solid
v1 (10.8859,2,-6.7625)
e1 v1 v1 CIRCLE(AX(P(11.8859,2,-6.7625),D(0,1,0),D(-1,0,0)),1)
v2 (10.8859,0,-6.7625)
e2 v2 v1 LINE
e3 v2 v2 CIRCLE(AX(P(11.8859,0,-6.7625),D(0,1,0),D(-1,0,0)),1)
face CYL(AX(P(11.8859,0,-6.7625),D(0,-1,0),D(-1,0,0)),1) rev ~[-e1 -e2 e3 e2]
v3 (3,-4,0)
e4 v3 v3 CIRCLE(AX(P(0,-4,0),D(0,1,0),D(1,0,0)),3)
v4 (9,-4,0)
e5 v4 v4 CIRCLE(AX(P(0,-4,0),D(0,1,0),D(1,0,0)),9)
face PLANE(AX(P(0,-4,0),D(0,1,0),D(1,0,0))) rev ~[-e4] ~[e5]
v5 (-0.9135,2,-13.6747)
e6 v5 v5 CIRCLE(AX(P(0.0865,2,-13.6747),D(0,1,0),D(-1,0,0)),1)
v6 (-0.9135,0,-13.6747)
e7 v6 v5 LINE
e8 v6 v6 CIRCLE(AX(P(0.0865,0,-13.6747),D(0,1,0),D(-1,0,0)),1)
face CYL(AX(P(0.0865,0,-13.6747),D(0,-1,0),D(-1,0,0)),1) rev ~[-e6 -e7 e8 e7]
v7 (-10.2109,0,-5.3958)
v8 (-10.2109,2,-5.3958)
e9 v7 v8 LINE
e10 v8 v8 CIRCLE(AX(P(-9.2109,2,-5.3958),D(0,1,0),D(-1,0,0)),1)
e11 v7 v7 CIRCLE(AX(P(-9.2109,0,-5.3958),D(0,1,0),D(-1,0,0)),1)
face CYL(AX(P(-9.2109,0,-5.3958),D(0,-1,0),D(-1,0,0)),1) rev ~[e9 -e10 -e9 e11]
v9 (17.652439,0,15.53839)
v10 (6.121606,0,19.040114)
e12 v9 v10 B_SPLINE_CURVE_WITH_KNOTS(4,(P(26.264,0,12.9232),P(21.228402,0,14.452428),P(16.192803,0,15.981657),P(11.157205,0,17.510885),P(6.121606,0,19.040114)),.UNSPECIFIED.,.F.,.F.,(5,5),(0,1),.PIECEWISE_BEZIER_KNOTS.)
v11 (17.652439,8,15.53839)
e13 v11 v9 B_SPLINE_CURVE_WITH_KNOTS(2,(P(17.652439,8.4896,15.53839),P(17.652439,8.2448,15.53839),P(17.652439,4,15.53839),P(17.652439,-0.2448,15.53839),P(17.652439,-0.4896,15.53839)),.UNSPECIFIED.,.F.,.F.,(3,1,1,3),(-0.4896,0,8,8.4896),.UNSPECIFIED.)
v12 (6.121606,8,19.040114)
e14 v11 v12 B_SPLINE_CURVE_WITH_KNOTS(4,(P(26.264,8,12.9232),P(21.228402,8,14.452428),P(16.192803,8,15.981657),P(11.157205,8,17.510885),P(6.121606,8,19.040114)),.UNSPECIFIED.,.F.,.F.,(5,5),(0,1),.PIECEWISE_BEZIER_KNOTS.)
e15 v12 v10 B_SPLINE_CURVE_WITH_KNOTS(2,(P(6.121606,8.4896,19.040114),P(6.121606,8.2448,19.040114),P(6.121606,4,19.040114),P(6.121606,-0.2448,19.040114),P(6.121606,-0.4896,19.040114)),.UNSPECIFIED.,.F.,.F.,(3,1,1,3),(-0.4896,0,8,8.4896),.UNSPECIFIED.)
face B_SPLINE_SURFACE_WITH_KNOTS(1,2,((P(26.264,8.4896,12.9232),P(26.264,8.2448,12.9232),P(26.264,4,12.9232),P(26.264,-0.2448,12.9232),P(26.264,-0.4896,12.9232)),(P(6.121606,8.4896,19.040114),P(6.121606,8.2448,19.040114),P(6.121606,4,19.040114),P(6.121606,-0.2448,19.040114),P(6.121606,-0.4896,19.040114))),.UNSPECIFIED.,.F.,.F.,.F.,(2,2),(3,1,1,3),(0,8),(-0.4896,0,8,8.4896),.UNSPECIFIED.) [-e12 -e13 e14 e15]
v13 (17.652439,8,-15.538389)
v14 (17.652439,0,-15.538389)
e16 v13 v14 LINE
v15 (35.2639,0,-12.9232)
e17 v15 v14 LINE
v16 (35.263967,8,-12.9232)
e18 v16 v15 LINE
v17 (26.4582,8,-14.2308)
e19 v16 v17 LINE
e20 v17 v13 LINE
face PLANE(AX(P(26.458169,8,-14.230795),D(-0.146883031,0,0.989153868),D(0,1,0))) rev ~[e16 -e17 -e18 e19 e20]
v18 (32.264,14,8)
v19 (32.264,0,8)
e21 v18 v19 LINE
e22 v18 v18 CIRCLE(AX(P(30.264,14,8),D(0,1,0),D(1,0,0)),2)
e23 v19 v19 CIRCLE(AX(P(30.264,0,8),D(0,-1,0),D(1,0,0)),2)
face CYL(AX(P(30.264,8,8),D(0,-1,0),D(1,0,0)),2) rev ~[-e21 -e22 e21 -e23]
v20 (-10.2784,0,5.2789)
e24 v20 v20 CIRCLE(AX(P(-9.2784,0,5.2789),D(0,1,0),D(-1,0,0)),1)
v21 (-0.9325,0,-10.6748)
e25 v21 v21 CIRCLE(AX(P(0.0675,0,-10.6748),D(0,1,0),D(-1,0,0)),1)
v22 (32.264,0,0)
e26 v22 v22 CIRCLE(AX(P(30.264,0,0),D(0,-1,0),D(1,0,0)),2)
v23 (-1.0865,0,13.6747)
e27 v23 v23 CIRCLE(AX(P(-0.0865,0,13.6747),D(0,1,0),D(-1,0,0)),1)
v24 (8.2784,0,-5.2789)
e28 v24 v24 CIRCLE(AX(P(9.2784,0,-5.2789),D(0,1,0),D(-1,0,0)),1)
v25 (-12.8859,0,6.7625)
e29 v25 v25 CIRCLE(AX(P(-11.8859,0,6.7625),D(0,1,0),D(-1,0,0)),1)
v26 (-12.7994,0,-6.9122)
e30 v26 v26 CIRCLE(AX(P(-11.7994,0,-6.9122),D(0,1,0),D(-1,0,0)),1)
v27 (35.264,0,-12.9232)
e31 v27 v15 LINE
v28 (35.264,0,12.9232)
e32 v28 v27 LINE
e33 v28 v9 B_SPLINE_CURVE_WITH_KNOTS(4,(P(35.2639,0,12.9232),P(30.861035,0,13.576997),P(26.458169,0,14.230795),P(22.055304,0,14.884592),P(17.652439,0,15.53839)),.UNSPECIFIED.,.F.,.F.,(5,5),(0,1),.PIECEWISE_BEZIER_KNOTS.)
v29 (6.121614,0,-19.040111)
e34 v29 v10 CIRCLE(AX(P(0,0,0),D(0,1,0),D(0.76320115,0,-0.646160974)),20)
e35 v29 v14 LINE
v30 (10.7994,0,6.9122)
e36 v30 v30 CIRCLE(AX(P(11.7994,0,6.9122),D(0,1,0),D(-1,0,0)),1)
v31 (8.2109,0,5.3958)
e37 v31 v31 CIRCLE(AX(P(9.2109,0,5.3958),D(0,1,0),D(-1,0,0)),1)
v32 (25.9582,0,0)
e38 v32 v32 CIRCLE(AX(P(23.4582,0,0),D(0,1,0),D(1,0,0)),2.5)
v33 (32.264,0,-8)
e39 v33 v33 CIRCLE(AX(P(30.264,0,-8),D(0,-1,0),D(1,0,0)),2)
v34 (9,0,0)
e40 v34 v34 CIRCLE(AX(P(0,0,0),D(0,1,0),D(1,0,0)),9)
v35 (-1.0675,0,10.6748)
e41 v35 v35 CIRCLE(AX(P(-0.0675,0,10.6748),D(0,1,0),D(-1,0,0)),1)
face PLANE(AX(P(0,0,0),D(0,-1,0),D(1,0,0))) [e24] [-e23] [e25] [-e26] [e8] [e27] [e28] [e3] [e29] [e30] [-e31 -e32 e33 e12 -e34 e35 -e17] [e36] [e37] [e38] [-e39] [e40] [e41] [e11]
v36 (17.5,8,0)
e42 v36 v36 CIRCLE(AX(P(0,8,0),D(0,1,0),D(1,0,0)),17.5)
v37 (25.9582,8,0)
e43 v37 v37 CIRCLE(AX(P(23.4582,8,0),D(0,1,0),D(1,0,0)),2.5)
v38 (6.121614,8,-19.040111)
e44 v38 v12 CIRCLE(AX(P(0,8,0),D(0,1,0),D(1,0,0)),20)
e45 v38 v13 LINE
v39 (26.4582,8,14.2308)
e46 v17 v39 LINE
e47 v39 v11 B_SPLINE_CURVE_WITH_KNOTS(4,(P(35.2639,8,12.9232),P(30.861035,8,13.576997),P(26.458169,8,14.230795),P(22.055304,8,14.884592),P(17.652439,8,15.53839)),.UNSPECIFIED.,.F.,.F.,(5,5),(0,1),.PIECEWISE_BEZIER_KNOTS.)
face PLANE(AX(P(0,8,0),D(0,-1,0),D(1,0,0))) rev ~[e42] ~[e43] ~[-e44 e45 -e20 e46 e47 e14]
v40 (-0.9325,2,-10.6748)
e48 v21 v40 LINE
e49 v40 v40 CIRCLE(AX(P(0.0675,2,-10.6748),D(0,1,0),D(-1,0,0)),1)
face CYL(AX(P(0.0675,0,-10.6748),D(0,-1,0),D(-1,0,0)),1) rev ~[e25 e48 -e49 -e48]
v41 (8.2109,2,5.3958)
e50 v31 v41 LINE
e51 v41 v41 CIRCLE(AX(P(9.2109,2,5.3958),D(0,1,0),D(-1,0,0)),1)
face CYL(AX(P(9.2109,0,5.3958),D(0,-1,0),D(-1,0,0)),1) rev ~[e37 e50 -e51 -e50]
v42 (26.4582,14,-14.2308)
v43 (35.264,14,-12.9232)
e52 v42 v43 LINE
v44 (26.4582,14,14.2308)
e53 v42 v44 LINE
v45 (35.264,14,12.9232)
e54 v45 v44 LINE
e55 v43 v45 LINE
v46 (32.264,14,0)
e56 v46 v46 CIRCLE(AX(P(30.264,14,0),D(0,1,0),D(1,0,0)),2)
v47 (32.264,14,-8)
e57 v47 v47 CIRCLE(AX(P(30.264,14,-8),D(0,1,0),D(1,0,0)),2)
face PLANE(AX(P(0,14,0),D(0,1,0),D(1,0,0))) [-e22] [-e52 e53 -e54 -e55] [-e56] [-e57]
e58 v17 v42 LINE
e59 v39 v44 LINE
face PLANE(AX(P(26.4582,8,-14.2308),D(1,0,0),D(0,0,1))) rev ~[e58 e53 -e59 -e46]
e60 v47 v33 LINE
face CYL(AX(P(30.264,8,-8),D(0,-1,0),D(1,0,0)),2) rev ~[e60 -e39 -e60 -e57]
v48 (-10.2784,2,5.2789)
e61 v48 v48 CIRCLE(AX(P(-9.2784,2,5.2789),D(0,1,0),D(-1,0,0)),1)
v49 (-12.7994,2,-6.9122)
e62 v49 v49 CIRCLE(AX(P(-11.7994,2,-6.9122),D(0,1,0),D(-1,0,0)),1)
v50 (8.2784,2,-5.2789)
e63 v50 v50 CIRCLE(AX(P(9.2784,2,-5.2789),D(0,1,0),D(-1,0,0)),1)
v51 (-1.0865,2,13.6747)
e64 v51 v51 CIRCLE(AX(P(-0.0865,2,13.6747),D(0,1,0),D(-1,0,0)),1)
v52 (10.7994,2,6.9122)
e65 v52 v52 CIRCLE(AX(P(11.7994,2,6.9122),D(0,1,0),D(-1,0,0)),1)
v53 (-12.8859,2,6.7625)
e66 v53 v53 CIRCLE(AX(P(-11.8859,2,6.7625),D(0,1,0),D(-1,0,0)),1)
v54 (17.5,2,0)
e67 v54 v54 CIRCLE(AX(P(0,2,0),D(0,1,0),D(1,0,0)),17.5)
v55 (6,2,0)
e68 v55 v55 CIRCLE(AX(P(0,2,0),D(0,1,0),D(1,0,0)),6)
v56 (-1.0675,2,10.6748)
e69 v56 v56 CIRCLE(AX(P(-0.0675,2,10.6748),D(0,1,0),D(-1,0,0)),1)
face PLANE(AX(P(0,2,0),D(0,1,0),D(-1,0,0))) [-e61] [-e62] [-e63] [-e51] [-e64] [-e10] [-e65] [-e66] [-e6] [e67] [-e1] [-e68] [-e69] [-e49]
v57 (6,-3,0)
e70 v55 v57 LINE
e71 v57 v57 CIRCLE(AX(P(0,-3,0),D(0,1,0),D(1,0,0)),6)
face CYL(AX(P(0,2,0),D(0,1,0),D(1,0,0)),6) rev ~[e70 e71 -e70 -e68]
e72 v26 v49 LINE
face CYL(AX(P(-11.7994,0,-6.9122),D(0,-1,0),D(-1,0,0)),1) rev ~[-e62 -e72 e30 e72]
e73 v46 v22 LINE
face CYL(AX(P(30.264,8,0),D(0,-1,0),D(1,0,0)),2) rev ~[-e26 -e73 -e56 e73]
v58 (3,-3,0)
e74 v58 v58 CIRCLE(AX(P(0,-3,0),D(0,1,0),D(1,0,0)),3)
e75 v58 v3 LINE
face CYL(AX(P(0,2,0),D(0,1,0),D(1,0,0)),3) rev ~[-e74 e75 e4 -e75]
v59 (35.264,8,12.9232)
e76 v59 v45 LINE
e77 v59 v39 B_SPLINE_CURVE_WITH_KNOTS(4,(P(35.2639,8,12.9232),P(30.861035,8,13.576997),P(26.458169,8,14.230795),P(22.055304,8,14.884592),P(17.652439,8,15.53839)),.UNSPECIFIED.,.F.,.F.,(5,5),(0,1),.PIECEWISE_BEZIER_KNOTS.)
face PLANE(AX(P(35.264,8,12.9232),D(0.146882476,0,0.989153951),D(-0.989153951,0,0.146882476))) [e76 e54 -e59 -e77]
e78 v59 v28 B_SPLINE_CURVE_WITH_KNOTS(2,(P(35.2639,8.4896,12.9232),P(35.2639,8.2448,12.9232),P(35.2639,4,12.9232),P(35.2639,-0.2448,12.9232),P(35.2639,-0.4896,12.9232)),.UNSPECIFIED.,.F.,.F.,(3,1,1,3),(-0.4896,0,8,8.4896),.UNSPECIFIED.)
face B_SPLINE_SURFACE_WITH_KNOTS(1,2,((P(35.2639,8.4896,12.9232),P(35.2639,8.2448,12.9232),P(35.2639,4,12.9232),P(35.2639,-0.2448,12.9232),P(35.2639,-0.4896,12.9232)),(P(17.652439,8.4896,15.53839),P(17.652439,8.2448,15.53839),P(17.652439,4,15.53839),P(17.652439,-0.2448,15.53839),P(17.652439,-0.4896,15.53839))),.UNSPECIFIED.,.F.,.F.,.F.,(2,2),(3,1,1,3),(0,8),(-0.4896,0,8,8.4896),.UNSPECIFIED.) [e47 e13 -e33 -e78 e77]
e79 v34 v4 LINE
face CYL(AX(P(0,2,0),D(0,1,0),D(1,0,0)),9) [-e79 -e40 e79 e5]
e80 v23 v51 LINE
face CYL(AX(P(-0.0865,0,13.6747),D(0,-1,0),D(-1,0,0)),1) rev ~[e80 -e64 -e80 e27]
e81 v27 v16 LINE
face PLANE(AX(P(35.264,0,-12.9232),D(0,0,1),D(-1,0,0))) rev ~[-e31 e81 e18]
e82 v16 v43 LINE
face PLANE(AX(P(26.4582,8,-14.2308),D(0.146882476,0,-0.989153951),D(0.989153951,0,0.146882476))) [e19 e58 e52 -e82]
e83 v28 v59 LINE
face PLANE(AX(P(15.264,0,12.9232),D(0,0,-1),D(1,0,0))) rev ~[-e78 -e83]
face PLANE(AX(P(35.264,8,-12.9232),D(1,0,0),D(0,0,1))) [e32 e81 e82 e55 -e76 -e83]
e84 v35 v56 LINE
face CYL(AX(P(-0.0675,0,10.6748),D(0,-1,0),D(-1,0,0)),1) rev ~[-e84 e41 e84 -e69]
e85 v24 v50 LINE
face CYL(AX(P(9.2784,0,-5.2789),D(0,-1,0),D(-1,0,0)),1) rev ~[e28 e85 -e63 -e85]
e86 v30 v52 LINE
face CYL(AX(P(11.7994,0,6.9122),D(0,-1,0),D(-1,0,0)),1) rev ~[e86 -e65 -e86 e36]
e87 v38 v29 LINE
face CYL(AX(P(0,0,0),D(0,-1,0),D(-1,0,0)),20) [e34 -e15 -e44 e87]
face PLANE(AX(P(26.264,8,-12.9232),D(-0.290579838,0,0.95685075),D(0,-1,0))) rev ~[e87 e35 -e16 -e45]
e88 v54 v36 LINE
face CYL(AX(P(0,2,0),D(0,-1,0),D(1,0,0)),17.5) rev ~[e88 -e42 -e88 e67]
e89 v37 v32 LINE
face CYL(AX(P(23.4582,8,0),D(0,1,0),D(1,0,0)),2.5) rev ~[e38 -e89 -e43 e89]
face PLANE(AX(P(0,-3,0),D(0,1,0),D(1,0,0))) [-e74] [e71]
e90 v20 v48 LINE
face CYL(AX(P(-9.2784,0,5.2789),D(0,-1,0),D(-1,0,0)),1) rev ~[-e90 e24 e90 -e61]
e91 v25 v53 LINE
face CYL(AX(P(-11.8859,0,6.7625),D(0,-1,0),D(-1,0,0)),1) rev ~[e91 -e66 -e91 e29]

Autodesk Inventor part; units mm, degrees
ref_plane "YZ Plane" through (0, 0, 0) normal (1, 0, 0) x (0, 1, 0)
ref_plane "XZ Plane" through (0, 0, 0) normal (0, 1, 0) x (-1, 0, 0)
ref_plane "XY Plane" through (0, 0, 0) normal (0, 0, 1) x (1, 0, 0)
sketch "Эскиз1" plane through (0, 0, 0) normal (0, 1, 0) x (-1, 0, 0)
  arc A0 (13.2517, 5.1196) -> (11.6396, 8.8847) centre (11.8859, 6.7625) ccw
  line L0 (11.6396, 8.8847) -> (3.5765, 5.9707)
  line L1 (3.5765, 5.9707) -> (2.1921, 14.0362)
  arc A1 (2.1921, 14.0362) -> (-1.8746, 14.5225) centre (0.0865, 13.6747) ccw
  line L2 (-1.8746, 14.5225) -> (-3.3825, 6.0827)
  line L3 (-3.3825, 6.0827) -> (-11.0596, 8.9165)
  arc A2 (-11.0596, 8.9165) -> (-13.5142, 5.6378) centre (-11.7994, 6.9122) ccw
  line L4 (-13.5142, 5.6378) -> (-6.959, 0.112)
  line L5 (-6.959, 0.112) -> (-13.2517, -5.1196)
  arc A3 (-13.2517, -5.1196) -> (-11.6396, -8.8847) centre (-11.8859, -6.7625) ccw
  line L6 (-11.6396, -8.8847) -> (-3.5765, -5.9707)
  line L7 (-3.5765, -5.9707) -> (-2.1921, -14.0362)
  arc A4 (-2.1921, -14.0362) -> (1.8746, -14.5225) centre (-0.0865, -13.6747) ccw
  line L8 (1.8746, -14.5225) -> (3.3825, -6.0827)
  line L9 (3.3825, -6.0827) -> (11.0596, -8.9165)
  arc A5 (11.0596, -8.9165) -> (13.5142, -5.6378) centre (11.7994, -6.9122) ccw
  line L10 (13.5142, -5.6378) -> (6.959, -0.112)
  line L11 (6.959, -0.112) -> (13.2517, 5.1196)
  circle A6 centre (6.6709, 3.7954) radius 1
  circle A7 centre (11.8859, 6.7625) radius 1
  circle A8 centre (9.2109, -5.3958) radius 1
  circle A9 centre (-0.0485, -7.6748) radius 1
  circle A10 centre (-0.0865, -13.6747) radius 1
  circle A11 centre (-9.2784, -5.2789) radius 1
  circle A12 centre (-6.6223, 3.8794) radius 1
  circle A13 centre (-11.7994, 6.9122) radius 1
  circle A14 centre (0.0675, 10.6748) radius 1
  circle A15 centre (0, 0) radius 4.75
  circle A16 centre (0.0865, 13.6747) radius 1
  circle A17 centre (0.0485, 7.6748) radius 1
  circle A18 centre (-9.2109, 5.3958) radius 1
  circle A19 centre (-11.8859, -6.7625) radius 1
  circle A20 centre (-6.6709, -3.7954) radius 1
  circle A21 centre (-0.0675, -10.6748) radius 1
  circle A22 centre (11.7994, -6.9122) radius 1
  circle A23 centre (6.6223, -3.8794) radius 1
  circle A24 centre (9.2784, 5.2789) radius 1
  circle A25 centre (0, 0) radius 1.875
  circle A26 centre (0, 0) radius 20
  circle A27 centre (0, 0) radius 17.5
  point P0 (0, 0)
  dimension "d0" = 40
  dimension "d1" = 35
extrude "Выдавливание1" add sketch "Эскиз1" along normal blind 2 contours L11 L10 A5 L9 L8 A4 L7 L6 A3 L5 L4 A2 L3 L2 A1 L1 L0 A0 | A26 | A27
sketch "Эскиз2" plane through (0, 2, 0) normal (0, 1, 0) x (1, 0, 0)
  arc A0 (13.2517, 5.1196) -> (11.6396, 8.8847) centre (11.8859, 6.7625) ccw
  line L0 (11.6396, 8.8847) -> (3.5765, 5.9707)
  line L1 (3.5765, 5.9707) -> (2.1921, 14.0362)
  arc A1 (2.1921, 14.0362) -> (-1.8746, 14.5225) centre (0.0865, 13.6747) ccw
  line L2 (-1.8746, 14.5225) -> (-3.3825, 6.0827)
  line L3 (-3.3825, 6.0827) -> (-11.0596, 8.9165)
  arc A2 (-11.0596, 8.9165) -> (-13.5142, 5.6378) centre (-11.7994, 6.9122) ccw
  line L4 (-13.5142, 5.6378) -> (-6.959, 0.112)
  line L5 (-6.959, 0.112) -> (-13.2517, -5.1196)
  arc A3 (-13.2517, -5.1196) -> (-11.6396, -8.8847) centre (-11.8859, -6.7625) ccw
  line L6 (-11.6396, -8.8847) -> (-3.5765, -5.9707)
  line L7 (-3.5765, -5.9707) -> (-2.1921, -14.0362)
  arc A4 (-2.1921, -14.0362) -> (1.8746, -14.5225) centre (-0.0865, -13.6747) ccw
  line L8 (1.8746, -14.5225) -> (3.3825, -6.0827)
  line L9 (3.3825, -6.0827) -> (11.0596, -8.9165)
  arc A5 (11.0596, -8.9165) -> (13.5142, -5.6378) centre (11.7994, -6.9122) ccw
  line L10 (13.5142, -5.6378) -> (6.959, -0.112)
  line L11 (6.959, -0.112) -> (13.2517, 5.1196)
  circle A6 centre (6.6709, 3.7954) radius 1
  circle A7 centre (11.8859, 6.7625) radius 1
  circle A8 centre (9.2109, -5.3958) radius 1
  circle A9 centre (-0.0485, -7.6748) radius 1
  circle A10 centre (-0.0865, -13.6747) radius 1
  circle A11 centre (-9.2784, -5.2789) radius 1
  circle A12 centre (-6.6223, 3.8794) radius 1
  circle A13 centre (-11.7994, 6.9122) radius 1
  circle A14 centre (0.0675, 10.6748) radius 1
  circle A15 centre (0, 0) radius 4.75
  circle A16 centre (0.0865, 13.6747) radius 1
  circle A17 centre (0.0485, 7.6748) radius 1
  circle A18 centre (-9.2109, 5.3958) radius 1
  circle A19 centre (-11.8859, -6.7625) radius 1
  circle A20 centre (-6.6709, -3.7954) radius 1
  circle A21 centre (-0.0675, -10.6748) radius 1
  circle A22 centre (11.7994, -6.9122) radius 1
  circle A23 centre (6.6223, -3.8794) radius 1
  circle A24 centre (9.2784, 5.2789) radius 1
  circle A25 centre (0, 0) radius 1.875
  circle A26 centre (0, 0) radius 20
  circle A27 centre (0, 0) radius 17.5
  point P0 (0, 0)
  dimension "d4" = 40
  dimension "d5" = 35
extrude "Выдавливание2" add sketch "Эскиз2" along normal blind 6 contours A26
sketch "Эскиз3" plane through (0, 0, 0) normal (0, -1, 0) x (1, 0, 0)
  circle A0 centre (0, 0) radius 20 projected
  line L0 (15.264, 12.9232) -> (15.264, -12.9232)
  line L1 (15.264, 12.9232) -> (35.264, 12.9232)
  line L2 (35.264, 12.9232) -> (35.264, -12.9232)
  line L3 (35.264, -12.9232) -> (15.264, -12.9232)
  line L4 (15.264, -12.9232) -> (15.264, 12.9232)
  dimension "d8" = 20
extrude "Выдавливание3" add sketch "Эскиз3" against normal up to surface (8 mm away) contours A0 L1 L2 L3
sketch "Эскиз4" plane through (0, 0, 0) normal (0, -1, 0) x (1, 0, 0)
  line L0 (35.264, 0) -> (30.264, 0)
  circle A0 centre (30.264, 0) radius 2
  point P0 (0, 0)
  dimension "d17" = 5
  dimension "d18" = 4
extrude "Выдавливание4" cut sketch "Эскиз4" against normal through all
pattern_linear "Прямоуг.массив2" count 3 spacing 8 along (0, 0, 1) of "Выдавливание4" first direction both ways yes
chamfer "Фаска3" distance 11 angle 45 2 edges at (15.264, 4, -12.9232) (15.264, 4, 12.9232)
chamfer "Фаска4" distance 9 angle 45 2 edges at (26.264, 4, 12.9232) (26.264, 4, -12.9232)
sketch "Эскиз8" plane through (0, 8, 0) normal (0, 1, 0) x (1, 0, 0)
  line L0 (17.6524, 15.5384) -> (35.264, 12.9232) projected
  line L1 (35.264, 12.9232) -> (35.264, -12.9232) projected
  line L2 (35.264, -12.9232) -> (17.6524, -15.5384) projected
  line L3 (35.264, 12.9232) -> (17.6524, 15.5384) projected
  line L4 (26.4582, 14.2308) -> (26.4582, -14.2308)
  line L5 (17.6524, -15.5384) -> (35.264, -12.9232) projected
  circle A0 centre (30.264, 8) radius 2 projected
  circle A1 centre (30.264, 0) radius 2 projected
  circle A2 centre (30.264, -8) radius 2 projected
  point P0 (0, 0)
extrude "Выдавливание8" add sketch "Эскиз8" along normal blind 6
sketch "Эскиз9" plane through (0, 2, 0) normal (0, 1, 0) x (1, 0, 0)
  circle A0 centre (0, 0) radius 9
  dimension "d44" = 18
extrude "Выдавливание9" add sketch "Эскиз9" against normal blind 6
sketch "Эскиз10" plane through (0, 2, 0) normal (0, 1, 0) x (1, 0, 0)
  circle A0 centre (0, 0) radius 3
  dimension "d48" = 6
extrude "Выдавливание10" cut sketch "Эскиз10" against normal through all
sketch "Эскиз11" plane through (0, 2, 0) normal (0, 1, 0) x (1, 0, 0)
  circle A0 centre (0, 0) radius 6
  dimension "d52" = 12
extrude "Выдавливание11" cut sketch "Эскиз11" against normal blind 5
sketch "Эскиз12" plane through (0, 8, 0) normal (0, 1, 0) x (1, 0, 0)
  line L0 (26.4582, 14.2308) -> (26.4582, -14.2308) projected
  line L1 (26.4582, 0) -> (23.4582, 0)
  circle A0 centre (23.4582, 0) radius 2.5
  point P0 (0, 0)
  dimension "d56" = 3
  dimension "d57" = 5
extrude "Выдавливание12" cut sketch "Эскиз12" against normal through all
properties part number "000.403 - Рычаг" material "Пластик АБС"
